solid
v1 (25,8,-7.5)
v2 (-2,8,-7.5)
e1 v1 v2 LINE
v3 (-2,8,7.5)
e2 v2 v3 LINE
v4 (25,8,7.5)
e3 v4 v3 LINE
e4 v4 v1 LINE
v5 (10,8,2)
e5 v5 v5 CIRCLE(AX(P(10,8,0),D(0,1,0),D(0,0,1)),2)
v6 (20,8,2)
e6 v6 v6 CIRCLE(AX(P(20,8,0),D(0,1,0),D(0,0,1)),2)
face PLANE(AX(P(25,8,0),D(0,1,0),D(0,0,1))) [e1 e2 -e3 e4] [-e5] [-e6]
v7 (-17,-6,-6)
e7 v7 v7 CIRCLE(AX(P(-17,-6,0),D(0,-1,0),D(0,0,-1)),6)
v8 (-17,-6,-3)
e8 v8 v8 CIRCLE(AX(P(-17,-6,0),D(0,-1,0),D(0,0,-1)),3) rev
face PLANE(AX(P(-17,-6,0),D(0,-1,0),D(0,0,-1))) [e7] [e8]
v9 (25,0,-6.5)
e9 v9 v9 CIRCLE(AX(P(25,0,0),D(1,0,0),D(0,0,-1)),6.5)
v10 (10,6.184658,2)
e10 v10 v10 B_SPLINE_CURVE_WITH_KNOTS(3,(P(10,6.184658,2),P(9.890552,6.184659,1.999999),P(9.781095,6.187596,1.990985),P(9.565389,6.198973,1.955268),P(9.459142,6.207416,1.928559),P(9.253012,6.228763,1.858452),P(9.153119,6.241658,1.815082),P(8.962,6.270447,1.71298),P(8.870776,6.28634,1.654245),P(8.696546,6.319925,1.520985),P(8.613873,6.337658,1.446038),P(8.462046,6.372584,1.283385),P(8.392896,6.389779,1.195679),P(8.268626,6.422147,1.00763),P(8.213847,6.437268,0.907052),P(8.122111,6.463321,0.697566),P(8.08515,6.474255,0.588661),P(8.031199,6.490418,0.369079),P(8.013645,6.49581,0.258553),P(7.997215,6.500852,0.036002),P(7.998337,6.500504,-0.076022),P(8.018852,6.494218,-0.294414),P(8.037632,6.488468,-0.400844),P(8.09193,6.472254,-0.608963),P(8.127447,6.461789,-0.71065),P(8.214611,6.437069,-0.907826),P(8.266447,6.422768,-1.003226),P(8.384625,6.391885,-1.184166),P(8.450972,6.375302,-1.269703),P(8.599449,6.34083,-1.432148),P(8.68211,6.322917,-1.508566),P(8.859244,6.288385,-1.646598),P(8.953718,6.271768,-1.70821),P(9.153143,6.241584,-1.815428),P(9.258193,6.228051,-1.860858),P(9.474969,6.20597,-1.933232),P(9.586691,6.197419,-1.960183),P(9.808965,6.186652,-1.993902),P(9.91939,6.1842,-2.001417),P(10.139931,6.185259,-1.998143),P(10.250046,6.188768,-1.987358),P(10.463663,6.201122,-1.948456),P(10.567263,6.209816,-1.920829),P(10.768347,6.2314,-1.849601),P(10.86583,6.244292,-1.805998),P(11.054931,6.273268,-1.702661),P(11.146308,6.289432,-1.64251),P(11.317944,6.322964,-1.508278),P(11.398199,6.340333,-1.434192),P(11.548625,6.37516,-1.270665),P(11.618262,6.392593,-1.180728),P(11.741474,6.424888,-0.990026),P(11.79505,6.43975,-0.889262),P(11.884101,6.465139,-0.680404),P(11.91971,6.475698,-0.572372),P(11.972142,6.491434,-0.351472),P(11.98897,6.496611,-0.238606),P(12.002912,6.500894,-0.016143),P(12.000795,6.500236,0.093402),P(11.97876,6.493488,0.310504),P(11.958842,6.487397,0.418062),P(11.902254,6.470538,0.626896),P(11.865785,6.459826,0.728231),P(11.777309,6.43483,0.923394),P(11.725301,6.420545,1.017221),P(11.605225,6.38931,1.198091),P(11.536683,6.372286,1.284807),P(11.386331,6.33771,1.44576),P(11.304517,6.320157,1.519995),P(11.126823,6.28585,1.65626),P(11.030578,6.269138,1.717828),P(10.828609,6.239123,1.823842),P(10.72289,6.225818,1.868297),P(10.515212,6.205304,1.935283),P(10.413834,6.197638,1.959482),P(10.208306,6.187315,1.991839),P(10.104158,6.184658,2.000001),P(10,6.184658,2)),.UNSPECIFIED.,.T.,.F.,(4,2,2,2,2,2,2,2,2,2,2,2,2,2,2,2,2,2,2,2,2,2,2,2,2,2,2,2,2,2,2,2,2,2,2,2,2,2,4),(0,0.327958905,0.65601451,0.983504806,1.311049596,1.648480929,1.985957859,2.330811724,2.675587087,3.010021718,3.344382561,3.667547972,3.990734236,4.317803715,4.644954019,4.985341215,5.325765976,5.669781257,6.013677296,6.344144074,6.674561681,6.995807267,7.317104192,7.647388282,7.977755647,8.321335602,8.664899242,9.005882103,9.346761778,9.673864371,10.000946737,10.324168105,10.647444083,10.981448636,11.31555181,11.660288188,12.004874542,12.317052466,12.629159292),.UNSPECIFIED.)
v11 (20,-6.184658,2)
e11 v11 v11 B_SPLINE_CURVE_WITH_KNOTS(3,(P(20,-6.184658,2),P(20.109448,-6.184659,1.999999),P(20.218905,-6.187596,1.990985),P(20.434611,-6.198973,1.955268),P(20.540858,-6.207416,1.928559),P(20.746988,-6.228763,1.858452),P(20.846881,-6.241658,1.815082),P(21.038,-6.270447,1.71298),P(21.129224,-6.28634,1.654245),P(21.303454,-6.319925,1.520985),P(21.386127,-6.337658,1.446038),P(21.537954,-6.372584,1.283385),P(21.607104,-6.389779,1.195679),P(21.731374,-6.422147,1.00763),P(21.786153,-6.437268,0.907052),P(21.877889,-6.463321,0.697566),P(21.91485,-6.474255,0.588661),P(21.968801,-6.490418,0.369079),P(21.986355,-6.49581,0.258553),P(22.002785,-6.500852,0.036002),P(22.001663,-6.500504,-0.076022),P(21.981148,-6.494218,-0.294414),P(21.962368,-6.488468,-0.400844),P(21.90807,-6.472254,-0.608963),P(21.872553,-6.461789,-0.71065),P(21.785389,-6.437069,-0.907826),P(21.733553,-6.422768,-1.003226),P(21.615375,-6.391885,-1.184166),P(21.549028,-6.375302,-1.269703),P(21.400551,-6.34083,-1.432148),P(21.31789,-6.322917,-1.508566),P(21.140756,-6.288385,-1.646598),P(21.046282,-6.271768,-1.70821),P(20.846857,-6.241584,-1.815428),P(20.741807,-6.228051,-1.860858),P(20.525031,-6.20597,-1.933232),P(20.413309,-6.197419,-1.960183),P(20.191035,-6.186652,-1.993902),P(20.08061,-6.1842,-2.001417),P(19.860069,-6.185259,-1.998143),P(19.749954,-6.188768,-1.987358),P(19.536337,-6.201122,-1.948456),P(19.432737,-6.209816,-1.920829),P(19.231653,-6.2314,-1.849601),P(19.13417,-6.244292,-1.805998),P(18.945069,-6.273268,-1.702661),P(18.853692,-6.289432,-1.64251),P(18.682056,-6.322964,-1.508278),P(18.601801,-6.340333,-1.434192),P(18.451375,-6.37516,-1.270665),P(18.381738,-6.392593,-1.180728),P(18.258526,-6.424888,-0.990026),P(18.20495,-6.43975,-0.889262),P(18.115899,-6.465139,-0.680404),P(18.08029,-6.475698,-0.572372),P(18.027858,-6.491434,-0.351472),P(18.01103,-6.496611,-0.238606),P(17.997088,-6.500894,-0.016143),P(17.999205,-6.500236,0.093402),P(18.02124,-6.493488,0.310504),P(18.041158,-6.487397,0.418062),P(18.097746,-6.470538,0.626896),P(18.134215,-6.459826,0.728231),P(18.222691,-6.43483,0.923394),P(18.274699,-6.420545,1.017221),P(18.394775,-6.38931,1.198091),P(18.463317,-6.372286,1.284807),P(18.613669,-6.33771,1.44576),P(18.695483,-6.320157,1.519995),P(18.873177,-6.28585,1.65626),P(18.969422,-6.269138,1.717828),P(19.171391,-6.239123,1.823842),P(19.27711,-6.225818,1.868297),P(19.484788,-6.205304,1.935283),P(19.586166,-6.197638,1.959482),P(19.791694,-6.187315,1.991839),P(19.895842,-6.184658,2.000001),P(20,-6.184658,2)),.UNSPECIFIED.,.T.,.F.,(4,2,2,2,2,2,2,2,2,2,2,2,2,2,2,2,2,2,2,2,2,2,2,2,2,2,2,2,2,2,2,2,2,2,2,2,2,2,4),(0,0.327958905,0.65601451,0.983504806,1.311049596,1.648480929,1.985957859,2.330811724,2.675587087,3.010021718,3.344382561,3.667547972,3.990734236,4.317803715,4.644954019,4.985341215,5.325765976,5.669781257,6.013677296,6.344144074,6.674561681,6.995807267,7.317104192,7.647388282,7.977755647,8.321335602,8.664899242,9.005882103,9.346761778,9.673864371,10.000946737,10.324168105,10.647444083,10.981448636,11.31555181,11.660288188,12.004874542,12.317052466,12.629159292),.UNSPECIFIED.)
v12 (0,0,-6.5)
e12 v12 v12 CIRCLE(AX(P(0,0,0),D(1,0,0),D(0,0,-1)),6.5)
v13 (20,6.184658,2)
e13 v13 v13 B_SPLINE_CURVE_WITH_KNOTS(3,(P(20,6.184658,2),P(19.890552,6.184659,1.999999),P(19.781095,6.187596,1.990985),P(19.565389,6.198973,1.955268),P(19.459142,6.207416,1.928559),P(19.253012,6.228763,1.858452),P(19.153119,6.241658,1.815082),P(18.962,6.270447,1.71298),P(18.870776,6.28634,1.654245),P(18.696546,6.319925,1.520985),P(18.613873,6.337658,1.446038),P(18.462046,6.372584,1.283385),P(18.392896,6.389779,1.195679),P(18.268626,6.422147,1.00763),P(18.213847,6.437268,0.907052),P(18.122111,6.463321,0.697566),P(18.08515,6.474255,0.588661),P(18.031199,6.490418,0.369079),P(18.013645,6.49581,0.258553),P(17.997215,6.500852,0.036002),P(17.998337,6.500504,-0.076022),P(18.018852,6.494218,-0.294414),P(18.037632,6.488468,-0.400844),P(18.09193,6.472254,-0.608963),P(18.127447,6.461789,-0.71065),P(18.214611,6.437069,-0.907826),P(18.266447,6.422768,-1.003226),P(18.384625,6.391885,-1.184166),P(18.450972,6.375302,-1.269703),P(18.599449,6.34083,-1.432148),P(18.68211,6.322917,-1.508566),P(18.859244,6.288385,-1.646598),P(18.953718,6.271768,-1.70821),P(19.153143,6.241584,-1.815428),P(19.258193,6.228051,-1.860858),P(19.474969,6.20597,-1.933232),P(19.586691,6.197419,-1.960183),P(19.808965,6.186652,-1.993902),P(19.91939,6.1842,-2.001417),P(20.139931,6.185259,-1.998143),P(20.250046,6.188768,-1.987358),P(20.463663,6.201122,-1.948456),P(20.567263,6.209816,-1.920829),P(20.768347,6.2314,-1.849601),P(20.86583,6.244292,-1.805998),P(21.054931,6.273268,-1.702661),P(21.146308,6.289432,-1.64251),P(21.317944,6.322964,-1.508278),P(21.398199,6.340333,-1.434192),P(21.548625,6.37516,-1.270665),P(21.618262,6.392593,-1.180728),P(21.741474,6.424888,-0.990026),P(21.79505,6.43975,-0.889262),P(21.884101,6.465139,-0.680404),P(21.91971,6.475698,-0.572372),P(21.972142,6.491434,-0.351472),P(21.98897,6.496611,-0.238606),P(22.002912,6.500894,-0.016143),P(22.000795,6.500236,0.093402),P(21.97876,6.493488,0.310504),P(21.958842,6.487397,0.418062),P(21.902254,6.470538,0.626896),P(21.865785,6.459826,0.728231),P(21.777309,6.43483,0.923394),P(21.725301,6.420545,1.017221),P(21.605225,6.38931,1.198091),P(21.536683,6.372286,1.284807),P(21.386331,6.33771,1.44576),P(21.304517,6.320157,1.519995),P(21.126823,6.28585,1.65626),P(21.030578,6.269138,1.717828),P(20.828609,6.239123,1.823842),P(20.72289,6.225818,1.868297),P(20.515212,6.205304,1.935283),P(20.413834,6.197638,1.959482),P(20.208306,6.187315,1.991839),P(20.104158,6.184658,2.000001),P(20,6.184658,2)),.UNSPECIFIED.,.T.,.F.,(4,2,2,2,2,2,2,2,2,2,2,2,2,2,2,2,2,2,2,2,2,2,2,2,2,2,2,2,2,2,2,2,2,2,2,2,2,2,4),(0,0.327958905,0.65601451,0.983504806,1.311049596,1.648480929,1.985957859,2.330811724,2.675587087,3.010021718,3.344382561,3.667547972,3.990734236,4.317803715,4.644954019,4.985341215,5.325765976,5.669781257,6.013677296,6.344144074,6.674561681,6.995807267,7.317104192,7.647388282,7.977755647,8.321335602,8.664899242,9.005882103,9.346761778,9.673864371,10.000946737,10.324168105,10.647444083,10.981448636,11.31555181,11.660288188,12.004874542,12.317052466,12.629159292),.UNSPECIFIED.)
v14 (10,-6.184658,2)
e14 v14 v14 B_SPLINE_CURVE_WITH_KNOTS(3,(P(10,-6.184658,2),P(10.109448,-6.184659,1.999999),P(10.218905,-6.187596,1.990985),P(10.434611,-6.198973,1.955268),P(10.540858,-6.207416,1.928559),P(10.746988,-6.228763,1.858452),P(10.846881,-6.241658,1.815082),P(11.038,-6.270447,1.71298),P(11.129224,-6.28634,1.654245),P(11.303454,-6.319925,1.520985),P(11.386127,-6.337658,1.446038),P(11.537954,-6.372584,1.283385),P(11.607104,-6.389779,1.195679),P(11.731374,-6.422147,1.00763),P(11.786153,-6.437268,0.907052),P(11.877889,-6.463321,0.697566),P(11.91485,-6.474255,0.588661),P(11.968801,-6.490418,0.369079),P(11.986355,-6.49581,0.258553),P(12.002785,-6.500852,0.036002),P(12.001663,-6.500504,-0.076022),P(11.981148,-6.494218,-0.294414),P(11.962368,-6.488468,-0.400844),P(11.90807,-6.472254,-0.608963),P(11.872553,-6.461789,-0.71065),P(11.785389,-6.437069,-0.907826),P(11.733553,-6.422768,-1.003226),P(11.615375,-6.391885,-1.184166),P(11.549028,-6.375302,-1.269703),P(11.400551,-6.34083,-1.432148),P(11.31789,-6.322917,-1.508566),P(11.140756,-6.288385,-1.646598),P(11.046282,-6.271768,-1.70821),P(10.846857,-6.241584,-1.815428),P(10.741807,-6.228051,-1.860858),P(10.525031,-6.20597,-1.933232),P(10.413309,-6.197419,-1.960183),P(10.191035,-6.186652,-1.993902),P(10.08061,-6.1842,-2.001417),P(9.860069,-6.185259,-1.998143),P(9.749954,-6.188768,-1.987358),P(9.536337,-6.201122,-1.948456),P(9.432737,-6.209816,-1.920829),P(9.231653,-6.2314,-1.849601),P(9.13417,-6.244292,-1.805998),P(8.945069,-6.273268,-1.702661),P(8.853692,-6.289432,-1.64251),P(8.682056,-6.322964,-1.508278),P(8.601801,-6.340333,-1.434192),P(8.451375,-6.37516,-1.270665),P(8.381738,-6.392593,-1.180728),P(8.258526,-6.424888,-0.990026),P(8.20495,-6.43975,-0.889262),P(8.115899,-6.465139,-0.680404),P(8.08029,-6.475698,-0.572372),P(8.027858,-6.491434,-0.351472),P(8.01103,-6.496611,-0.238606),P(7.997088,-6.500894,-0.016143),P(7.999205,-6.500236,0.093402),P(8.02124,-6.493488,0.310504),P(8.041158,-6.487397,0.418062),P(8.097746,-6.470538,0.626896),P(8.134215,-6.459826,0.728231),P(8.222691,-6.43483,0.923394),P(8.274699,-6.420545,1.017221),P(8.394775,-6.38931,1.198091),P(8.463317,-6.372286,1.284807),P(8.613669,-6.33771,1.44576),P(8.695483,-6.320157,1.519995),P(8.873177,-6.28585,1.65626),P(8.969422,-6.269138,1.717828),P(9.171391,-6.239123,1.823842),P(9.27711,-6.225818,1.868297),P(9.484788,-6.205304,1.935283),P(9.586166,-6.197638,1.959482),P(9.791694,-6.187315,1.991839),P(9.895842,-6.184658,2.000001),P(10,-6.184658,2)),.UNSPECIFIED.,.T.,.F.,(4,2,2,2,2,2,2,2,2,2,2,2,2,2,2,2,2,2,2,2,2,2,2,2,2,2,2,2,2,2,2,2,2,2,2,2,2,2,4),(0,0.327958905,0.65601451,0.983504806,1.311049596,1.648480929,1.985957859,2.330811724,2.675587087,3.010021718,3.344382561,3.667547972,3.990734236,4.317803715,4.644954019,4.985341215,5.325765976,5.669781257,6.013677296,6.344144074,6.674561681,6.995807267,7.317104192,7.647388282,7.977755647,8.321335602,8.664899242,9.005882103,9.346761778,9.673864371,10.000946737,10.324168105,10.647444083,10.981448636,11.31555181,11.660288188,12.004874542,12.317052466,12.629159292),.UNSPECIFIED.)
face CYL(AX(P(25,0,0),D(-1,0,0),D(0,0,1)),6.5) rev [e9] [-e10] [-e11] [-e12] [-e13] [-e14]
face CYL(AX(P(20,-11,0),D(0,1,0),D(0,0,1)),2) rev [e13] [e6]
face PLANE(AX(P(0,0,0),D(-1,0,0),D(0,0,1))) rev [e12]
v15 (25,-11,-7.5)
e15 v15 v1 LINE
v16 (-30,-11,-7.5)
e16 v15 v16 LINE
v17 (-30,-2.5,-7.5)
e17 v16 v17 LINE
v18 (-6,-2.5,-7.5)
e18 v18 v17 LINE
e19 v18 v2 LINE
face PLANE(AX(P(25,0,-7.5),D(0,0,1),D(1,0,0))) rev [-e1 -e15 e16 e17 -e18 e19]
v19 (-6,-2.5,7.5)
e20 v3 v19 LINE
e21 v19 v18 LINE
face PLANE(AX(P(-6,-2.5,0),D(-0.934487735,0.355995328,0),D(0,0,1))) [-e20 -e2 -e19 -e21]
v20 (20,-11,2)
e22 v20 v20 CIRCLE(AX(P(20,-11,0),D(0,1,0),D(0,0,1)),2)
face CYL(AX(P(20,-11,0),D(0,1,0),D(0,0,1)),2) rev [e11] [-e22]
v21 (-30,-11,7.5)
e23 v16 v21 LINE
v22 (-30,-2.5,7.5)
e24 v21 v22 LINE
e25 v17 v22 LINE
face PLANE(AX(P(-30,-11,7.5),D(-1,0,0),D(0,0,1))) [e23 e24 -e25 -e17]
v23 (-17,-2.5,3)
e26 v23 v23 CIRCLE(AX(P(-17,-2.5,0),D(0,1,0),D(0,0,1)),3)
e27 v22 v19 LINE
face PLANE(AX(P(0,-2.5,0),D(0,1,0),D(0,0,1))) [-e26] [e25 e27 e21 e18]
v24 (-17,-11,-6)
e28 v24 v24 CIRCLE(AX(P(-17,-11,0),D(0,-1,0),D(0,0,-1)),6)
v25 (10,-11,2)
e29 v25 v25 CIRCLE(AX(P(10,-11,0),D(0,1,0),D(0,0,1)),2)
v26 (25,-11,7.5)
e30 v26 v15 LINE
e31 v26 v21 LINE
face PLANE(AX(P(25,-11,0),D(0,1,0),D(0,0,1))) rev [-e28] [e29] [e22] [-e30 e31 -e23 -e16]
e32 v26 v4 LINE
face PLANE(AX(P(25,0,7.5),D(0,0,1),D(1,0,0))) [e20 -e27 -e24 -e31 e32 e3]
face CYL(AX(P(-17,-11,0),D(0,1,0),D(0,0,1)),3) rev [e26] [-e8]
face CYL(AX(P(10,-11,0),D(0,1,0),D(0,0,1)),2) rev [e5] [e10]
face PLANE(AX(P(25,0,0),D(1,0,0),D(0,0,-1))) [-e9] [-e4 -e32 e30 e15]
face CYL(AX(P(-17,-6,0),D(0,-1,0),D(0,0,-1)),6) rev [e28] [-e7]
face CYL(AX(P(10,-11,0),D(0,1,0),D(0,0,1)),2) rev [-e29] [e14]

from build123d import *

# Parameters (mm, degrees)
SKETCH1_W               = 15
SKETCH1_H               = 19
SKETCH1_R               = 6.5
BOSS_EXTRUDE1_DEPTH     = 25
SKETCH2_W               = 15
SKETCH2_H               = 19
BOSS_EXTRUDE2_DEPTH     = 2
CUT_EXTRUDE1_DEPTH      = 29.324018077
CUT_EXTRUDE1_DEPTH_BACK = 29.324018077
SKETCH4_R               = 2
SKETCH3_W               = 28
SKETCH3_H               = 15
SKETCH3_R               = 3
BOSS_EXTRUDE3_DEPTH     = 8.5
CHAMFER1_SIZE2          = 10.5
CHAMFER1_SIZE           = 4
SKETCH7_R               = 6
CUT_EXTRUDE4_DEPTH      = 5


with BuildPart() as part:
    # Sketch1 → Boss-Extrude1 (new body)
    with BuildSketch(Plane(origin=(0, 0, 0), x_dir=(0, 0, -1), z_dir=(1, 0, 0))):
        with Locations((0, -1.5)):
            Rectangle(SKETCH1_W, SKETCH1_H)
        Circle(SKETCH1_R, mode=Mode.SUBTRACT)
    extrude(amount=BOSS_EXTRUDE1_DEPTH)

    # Sketch2 → Boss-Extrude2 (add)
    with BuildSketch(Plane(origin=(0, 0, 0), x_dir=(0, 0, -1), z_dir=(1, 0, 0))):
        with Locations((0, -1.5)):
            Rectangle(SKETCH2_W, SKETCH2_H)
    extrude(amount=-BOSS_EXTRUDE2_DEPTH)

    # Sketch4 → Cut-Extrude1 (cut, two sides: drawn at the far end of the back side and taken through both)
    with BuildSketch(Plane(origin=(0, 0, 0), x_dir=(1, 0, 0), z_dir=(0, 1, 0)).offset(-CUT_EXTRUDE1_DEPTH_BACK)):
        with Locations(Location((10, 0, 0), (0, 0, 270))):
            Circle(SKETCH4_R)
        with Locations(Location((20, 0, 0), (0, 0, 270))):
            Circle(SKETCH4_R)
    extrude(amount=CUT_EXTRUDE1_DEPTH + CUT_EXTRUDE1_DEPTH_BACK, mode=Mode.SUBTRACT)

    # Sketch3 → Boss-Extrude3 (add)
    with BuildSketch(Plane(origin=(0, -2.5, 0), x_dir=(1, 0, 0), z_dir=(0, 1, 0))):
        with Locations((-16, 0)):
            Rectangle(SKETCH3_W, SKETCH3_H)
        with Locations(Location((-17, 0, 0), (0, 0, 270))):
            Circle(SKETCH3_R, mode=Mode.SUBTRACT)
    extrude(amount=-BOSS_EXTRUDE3_DEPTH)

    # Chamfer1
    chamfer1_edges = [part.edges().sort_by_distance(p)[0] for p in [
        (-2, -2.5, 0),
    ]]
    chamfer1_side = [part.faces().sort_by_distance(p)[0] for p in [
        (-2.08, -2.5, 0),
    ]]
    chamfer(chamfer1_edges, length=CHAMFER1_SIZE - 0.0001, length2=CHAMFER1_SIZE2 - 0.0001, reference=chamfer1_side[0])  # a hair under: the kernel refuses the full size

    # Sketch7 → Cut-Extrude4 (cut)
    with BuildSketch(Plane.XZ.offset(11)):
        with Locations(Location((-17, 0, 0), (0, 0, 270))):
            Circle(SKETCH7_R)
    extrude(amount=-CUT_EXTRUDE4_DEPTH, mode=Mode.SUBTRACT)


solid = part.part
